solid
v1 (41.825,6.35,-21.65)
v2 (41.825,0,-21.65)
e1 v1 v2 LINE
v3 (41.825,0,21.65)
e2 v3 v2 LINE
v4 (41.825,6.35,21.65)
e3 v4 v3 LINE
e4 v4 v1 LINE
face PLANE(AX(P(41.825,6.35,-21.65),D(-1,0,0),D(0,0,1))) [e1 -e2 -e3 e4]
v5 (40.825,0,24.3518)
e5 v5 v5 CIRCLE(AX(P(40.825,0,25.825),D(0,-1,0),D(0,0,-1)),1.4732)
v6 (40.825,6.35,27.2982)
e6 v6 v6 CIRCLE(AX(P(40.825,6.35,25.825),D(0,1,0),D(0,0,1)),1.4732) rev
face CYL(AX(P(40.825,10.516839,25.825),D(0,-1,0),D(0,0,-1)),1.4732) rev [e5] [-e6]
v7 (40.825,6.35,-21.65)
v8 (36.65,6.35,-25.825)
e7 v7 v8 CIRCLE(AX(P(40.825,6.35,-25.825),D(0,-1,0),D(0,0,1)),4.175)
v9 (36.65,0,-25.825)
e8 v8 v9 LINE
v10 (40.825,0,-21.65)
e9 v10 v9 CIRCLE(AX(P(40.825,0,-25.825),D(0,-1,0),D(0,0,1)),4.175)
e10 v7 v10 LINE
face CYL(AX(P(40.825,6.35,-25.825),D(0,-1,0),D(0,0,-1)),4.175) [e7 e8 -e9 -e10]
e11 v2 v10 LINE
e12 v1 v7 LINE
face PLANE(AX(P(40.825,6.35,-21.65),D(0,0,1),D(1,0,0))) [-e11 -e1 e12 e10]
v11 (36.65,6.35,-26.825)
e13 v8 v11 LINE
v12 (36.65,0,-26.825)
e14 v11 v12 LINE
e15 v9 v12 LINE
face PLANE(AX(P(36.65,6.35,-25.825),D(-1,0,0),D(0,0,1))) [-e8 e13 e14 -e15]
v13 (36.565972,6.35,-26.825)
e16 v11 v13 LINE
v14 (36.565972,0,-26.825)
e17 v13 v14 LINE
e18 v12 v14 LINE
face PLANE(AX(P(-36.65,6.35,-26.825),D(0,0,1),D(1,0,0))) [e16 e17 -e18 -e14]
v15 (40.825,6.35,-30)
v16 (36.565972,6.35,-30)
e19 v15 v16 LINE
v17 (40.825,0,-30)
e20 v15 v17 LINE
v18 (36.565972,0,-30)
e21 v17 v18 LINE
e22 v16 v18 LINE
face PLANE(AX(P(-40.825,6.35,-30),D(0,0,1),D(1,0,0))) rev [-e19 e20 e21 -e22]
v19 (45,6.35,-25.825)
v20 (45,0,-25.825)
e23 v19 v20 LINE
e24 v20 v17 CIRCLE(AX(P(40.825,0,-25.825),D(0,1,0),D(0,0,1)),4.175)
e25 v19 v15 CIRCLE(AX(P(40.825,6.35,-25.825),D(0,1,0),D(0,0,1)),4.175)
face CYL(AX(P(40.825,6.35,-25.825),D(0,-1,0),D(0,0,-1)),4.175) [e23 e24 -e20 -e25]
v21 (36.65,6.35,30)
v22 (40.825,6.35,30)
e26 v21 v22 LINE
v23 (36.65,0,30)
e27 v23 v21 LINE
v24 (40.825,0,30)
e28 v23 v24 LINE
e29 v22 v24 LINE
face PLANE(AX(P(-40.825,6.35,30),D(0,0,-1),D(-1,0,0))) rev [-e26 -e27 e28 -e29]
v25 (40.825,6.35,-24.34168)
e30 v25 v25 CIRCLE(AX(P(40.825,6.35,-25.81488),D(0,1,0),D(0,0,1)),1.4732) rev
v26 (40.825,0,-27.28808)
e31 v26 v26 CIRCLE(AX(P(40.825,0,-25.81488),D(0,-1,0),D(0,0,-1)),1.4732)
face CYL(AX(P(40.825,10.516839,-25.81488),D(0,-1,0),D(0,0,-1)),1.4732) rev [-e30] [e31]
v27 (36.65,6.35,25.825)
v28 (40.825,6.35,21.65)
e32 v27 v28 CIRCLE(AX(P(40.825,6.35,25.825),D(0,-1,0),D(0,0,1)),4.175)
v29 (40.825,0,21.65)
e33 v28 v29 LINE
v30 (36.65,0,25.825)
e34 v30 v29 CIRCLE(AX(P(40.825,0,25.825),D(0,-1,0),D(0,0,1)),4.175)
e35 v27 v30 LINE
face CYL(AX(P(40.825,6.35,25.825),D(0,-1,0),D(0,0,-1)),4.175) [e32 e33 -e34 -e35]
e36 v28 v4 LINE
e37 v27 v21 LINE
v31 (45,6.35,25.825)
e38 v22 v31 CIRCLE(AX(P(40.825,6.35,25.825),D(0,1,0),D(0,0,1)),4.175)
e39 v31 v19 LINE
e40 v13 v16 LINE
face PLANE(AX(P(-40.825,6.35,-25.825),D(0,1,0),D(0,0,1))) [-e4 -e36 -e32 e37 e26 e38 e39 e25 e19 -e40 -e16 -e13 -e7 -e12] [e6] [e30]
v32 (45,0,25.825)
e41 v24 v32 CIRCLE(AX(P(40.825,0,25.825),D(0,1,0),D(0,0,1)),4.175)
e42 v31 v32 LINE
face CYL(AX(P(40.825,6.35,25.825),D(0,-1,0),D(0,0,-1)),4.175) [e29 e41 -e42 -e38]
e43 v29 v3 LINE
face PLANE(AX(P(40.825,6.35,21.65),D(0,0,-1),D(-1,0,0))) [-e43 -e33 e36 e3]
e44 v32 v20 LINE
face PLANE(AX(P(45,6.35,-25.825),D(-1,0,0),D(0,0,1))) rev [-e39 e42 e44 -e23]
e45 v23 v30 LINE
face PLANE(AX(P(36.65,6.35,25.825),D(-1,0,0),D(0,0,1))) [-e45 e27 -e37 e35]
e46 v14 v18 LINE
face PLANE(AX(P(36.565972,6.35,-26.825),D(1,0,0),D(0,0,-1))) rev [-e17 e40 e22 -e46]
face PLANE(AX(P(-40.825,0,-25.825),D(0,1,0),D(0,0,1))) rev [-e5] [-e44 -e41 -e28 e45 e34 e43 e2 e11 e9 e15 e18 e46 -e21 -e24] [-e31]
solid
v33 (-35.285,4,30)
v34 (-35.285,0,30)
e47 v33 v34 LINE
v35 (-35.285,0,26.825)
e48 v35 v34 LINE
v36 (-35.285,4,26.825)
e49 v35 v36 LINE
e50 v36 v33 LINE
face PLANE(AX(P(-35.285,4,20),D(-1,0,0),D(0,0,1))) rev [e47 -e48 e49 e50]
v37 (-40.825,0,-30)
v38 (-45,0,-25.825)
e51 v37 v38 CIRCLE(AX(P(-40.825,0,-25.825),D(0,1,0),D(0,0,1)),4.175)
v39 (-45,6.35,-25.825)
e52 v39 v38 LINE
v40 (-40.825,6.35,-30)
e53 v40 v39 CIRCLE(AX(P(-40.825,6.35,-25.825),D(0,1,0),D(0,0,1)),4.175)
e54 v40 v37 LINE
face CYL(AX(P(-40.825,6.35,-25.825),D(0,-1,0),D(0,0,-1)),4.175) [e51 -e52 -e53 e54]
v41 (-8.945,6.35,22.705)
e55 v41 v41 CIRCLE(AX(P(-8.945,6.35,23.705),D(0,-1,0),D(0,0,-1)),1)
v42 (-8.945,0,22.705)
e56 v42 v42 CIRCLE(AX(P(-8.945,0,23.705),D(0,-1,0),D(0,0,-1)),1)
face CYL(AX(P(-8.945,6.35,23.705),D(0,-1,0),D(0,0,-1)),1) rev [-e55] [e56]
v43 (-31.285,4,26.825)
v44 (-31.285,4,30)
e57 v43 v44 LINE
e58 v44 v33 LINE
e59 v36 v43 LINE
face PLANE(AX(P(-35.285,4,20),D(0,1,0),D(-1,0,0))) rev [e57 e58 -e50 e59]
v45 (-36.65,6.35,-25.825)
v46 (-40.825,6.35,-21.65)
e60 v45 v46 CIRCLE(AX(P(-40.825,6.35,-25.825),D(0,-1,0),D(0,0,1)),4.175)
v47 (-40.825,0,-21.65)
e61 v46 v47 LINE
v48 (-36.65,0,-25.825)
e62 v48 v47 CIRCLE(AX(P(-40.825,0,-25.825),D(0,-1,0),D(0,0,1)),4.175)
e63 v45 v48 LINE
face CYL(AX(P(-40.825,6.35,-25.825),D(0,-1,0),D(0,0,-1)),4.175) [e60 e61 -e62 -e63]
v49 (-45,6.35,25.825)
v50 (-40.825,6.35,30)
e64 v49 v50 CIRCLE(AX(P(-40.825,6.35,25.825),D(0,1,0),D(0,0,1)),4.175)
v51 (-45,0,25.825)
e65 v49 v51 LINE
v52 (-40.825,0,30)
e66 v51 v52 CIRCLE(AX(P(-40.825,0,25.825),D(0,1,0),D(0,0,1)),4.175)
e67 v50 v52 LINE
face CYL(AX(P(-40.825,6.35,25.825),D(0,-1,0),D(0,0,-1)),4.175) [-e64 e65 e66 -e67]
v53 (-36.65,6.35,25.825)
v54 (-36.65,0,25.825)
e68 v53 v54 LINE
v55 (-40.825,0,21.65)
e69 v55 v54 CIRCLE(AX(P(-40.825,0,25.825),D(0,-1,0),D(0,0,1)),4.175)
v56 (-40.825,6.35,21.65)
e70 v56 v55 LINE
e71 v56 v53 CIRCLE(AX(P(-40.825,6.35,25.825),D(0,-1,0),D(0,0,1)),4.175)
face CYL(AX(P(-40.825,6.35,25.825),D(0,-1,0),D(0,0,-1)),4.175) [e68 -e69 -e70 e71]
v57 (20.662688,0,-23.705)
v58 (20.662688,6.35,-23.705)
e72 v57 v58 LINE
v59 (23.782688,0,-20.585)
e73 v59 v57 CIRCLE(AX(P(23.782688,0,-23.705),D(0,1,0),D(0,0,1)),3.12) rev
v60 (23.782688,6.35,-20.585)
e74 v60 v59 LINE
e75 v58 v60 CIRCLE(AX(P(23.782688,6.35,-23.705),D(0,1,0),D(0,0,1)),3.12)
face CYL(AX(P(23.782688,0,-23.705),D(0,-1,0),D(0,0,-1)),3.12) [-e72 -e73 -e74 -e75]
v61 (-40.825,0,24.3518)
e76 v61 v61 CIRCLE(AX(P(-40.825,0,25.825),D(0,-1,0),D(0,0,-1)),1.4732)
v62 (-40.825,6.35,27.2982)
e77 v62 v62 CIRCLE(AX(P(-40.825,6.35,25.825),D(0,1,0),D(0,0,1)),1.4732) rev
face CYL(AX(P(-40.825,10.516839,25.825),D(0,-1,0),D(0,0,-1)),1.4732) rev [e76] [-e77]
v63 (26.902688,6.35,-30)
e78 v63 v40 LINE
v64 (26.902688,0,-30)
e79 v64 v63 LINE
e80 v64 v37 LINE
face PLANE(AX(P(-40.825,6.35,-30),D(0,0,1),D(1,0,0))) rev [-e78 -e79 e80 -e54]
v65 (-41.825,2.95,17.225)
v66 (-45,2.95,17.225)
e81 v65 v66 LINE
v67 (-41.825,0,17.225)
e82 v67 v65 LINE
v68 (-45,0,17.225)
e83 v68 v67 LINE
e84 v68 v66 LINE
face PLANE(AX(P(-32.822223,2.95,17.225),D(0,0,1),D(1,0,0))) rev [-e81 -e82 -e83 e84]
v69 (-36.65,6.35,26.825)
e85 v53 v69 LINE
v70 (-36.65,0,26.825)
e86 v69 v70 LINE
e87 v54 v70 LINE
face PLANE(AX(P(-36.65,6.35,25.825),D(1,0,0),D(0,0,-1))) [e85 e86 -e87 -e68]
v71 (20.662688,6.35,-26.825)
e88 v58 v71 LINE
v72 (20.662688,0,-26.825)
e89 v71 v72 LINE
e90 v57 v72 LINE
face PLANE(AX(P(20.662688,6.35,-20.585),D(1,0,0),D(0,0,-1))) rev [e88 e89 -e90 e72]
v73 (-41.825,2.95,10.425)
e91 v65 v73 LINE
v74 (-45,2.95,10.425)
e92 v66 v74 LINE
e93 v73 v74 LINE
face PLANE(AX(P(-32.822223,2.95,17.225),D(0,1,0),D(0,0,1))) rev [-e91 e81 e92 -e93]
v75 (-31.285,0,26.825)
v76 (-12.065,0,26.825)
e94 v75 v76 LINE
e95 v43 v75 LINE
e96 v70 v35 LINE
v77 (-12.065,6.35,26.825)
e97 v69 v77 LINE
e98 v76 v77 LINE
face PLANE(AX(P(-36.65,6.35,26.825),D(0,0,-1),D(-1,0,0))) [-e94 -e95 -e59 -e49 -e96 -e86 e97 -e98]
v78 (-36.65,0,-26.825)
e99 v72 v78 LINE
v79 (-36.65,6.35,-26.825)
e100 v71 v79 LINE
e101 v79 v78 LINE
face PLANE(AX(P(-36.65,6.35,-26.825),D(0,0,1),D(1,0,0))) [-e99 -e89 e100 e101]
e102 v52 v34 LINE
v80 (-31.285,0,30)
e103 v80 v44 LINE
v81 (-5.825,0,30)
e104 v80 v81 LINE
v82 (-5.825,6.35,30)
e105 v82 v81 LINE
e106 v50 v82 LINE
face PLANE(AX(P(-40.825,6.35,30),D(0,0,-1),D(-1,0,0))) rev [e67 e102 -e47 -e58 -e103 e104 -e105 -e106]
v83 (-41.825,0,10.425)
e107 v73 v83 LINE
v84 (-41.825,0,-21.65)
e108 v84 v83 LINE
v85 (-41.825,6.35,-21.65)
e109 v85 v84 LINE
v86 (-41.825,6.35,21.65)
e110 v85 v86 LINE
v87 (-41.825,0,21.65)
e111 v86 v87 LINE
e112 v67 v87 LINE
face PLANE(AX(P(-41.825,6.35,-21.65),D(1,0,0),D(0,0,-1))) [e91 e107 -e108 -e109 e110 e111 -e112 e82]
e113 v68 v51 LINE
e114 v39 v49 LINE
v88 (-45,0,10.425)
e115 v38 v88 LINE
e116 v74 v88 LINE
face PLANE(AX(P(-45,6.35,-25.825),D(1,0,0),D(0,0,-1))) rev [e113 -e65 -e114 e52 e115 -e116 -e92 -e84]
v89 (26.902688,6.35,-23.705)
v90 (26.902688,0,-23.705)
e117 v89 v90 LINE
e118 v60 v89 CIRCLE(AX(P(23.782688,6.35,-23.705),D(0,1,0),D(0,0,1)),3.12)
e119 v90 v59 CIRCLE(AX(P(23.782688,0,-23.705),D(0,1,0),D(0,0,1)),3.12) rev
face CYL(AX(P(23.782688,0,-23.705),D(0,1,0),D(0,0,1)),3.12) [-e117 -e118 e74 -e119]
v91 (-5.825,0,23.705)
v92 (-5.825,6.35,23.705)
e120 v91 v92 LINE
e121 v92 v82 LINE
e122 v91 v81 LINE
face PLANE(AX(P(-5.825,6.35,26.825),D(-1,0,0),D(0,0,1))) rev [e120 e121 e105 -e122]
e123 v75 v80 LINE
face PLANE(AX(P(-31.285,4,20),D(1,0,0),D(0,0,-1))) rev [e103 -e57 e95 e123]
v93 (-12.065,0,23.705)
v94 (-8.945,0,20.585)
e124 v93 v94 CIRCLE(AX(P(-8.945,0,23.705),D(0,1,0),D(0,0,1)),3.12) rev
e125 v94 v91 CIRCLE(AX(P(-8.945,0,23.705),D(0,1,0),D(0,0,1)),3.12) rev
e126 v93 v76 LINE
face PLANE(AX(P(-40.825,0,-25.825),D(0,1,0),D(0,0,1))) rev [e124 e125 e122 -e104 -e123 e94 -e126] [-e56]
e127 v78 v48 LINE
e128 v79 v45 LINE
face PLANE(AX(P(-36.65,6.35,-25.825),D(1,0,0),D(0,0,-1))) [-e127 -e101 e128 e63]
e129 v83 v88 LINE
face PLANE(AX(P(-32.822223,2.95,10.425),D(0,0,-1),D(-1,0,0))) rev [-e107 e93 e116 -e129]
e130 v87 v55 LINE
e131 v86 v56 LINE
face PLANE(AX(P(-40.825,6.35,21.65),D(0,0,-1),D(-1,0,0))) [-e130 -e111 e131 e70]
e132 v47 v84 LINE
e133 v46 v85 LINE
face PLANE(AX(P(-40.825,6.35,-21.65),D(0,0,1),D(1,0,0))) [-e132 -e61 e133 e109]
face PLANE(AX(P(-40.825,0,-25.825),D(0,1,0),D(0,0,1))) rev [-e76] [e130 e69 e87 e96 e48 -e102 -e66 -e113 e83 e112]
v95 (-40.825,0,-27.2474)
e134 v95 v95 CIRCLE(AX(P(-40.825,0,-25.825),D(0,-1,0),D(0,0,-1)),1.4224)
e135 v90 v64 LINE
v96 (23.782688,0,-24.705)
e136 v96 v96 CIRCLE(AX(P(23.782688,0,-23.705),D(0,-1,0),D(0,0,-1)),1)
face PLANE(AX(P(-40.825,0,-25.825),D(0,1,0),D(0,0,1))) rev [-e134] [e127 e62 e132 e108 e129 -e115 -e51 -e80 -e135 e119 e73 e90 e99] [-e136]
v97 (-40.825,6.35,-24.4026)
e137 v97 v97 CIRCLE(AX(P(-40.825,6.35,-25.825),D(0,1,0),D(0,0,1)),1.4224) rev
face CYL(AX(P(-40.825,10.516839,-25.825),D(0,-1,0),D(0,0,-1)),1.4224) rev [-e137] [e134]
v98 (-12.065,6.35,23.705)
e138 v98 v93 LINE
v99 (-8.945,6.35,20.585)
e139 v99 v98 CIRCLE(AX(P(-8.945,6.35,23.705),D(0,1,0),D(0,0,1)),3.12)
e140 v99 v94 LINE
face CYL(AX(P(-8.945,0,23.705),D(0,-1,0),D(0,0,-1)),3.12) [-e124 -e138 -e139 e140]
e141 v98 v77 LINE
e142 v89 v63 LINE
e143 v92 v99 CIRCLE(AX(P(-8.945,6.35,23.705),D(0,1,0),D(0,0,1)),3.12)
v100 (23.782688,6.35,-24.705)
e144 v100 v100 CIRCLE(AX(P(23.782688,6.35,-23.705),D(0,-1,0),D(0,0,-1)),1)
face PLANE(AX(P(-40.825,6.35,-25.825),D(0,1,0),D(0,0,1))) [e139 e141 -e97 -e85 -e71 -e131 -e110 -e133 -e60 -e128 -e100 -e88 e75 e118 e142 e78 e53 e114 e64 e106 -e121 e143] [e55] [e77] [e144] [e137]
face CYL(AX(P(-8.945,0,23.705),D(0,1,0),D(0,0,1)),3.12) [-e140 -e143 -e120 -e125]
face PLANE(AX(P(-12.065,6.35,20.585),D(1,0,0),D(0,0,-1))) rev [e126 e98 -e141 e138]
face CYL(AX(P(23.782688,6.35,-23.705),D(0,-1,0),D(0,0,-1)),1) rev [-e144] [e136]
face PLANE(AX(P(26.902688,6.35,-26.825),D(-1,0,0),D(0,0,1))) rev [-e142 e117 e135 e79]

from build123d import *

# Parameters (mm, degrees)
BOSS_EXTRUDE3_DEPTH = 6.35
SKETCH3_W           = 9.663283239
SKETCH3_H           = 6.35
CUT_EXTRUDE1_DEPTH  = 3.175
SKETCH4_W           = 42.475
SKETCH4_H           = 6.35
CUT_EXTRUDE2_DEPTH  = 8.35
SKETCH5_W           = 6.8
SKETCH5_H           = 5.9
CUT_EXTRUDE3_DEPTH  = 3.175
SKETCH6_R           = 1.4732
CUT_EXTRUDE4_DEPTH  = 6.35
SKETCH7_R           = 1.4224
SKETCH7_R_2         = 1.4732
CUT_EXTRUDE5_DEPTH  = 6.35
SKETCH8_W           = 6.24
SKETCH8_H           = 6.35
BOSS_EXTRUDE4_DEPTH = 6.24
SKETCH9_W           = 6.24
SKETCH9_H           = 6.35
BOSS_EXTRUDE5_DEPTH = 6.24
SKETCH10_R          = 1
CUT_EXTRUDE6_DEPTH  = 55.454774814
FILLET1_R           = 3.12
SKETCH11_W          = 4
SKETCH11_H          = 4
CUT_EXTRUDE7_DEPTH  = 10


with BuildPart() as part:
    # Sketch2 → Boss-Extrude3 (new body)
    with BuildSketch(Plane(origin=(0, 0, 0), x_dir=(1, 0, 0), z_dir=(0, 1, 0))):
        with BuildLine():
            Line((-45, 25.825), (-45, -25.825))
            ThreePointArc((-45, -25.825), (-43.777170811, -28.777170811), (-40.825, -30))
            Line((-40.825, -30), (40.825, -30))
            ThreePointArc((40.825, -30), (43.777170811, -28.777170811), (45, -25.825))
            Line((45, -25.825), (45, 25.825))
            ThreePointArc((45, 25.825), (43.777170811, 28.777170811), (40.825, 30))
            Line((40.825, 30), (-40.825, 30))
            ThreePointArc((-40.825, 30), (-43.777170811, 28.777170811), (-45, 25.825))
        make_face()
        with BuildLine():
            Line((40.825, 21.65), (41.825, 21.65))
            Line((41.825, 21.65), (41.825, -21.65))
            Line((41.825, -21.65), (40.825, -21.65))
            ThreePointArc((40.825, -21.65), (37.872829189, -22.872829189), (36.65, -25.825))
            Line((36.65, -25.825), (36.65, -26.825))
            Line((36.65, -26.825), (-36.65, -26.825))
            Line((-36.65, -26.825), (-36.65, -25.825))
            ThreePointArc((-36.65, -25.825), (-37.872829189, -22.872829189), (-40.825, -21.65))
            Line((-40.825, -21.65), (-41.825, -21.65))
            Line((-41.825, -21.65), (-41.825, 21.65))
            Line((-41.825, 21.65), (-40.825, 21.65))
            ThreePointArc((-40.825, 21.65), (-37.872829189, 22.872829189), (-36.65, 25.825))
            Line((-36.65, 25.825), (-36.65, 26.825))
            Line((-36.65, 26.825), (36.65, 26.825))
            Line((36.65, 26.825), (36.65, 25.825))
            ThreePointArc((36.65, 25.825), (37.872829189, 22.872829189), (40.825, 21.65))
        make_face(mode=Mode.SUBTRACT)
    extrude(amount=BOSS_EXTRUDE3_DEPTH)

    # Sketch3 → Cut-Extrude1 (cut)
    with BuildSketch(Plane(origin=(0, 0, -30), x_dir=(-1, 0, 0), z_dir=(0, 0, -1))):
        with Locations((-31.734329903, 3.175)):
            Rectangle(SKETCH3_W, SKETCH3_H)
    extrude(amount=-CUT_EXTRUDE1_DEPTH, mode=Mode.SUBTRACT)

    # Sketch4 → Cut-Extrude2 (cut)
    with BuildSketch(Plane.XY.offset(30)):
        with Locations((15.4125, 3.175)):
            Rectangle(SKETCH4_W, SKETCH4_H)
    extrude(amount=-CUT_EXTRUDE2_DEPTH, mode=Mode.SUBTRACT)


with BuildPart() as cut_extrude2_piece_1:
    # of the separate pieces the step leaves, piece 1, a body of its own (cut_extrude2_pieces)
    add(part.part.solids().sort_by_distance((-40.825, 0, 30))[0])

    # Sketch5 → Cut-Extrude3 (cut)
    with BuildSketch(Plane.ZY.offset(45)):
        with Locations((13.825, 0)):
            Rectangle(SKETCH5_W, SKETCH5_H)
    extrude(amount=-CUT_EXTRUDE3_DEPTH, mode=Mode.SUBTRACT)

    # Sketch7 → Cut-Extrude5 (cut)
    with BuildSketch(Plane.XZ):
        with Locations(Location((-40.825, -25.825, 0), (0, 0, 270))):
            Circle(SKETCH7_R)
        with Locations(Location((-40.825, 25.825, 0), (0, 0, 270))):
            Circle(SKETCH7_R_2)
    extrude(amount=-CUT_EXTRUDE5_DEPTH, mode=Mode.SUBTRACT)

    # Sketch8 → Boss-Extrude4 (add)
    with BuildSketch(Plane(origin=(0, 0, 26.825), x_dir=(-1, 0, 0), z_dir=(0, 0, -1))):
        with Locations((8.945, 3.175)):
            Rectangle(SKETCH8_W, SKETCH8_H)
    extrude(amount=BOSS_EXTRUDE4_DEPTH)

    # Sketch9 → Boss-Extrude5 (add)
    with BuildSketch(Plane.XY.offset(-26.825)):
        with Locations((23.782688283, 3.175)):
            Rectangle(SKETCH9_W, SKETCH9_H)
    extrude(amount=BOSS_EXTRUDE5_DEPTH)

    # Sketch10 → Cut-Extrude6 (cut, through all)
    with BuildSketch(Plane(origin=(0, 0, 0), x_dir=(-1, 0, 0), z_dir=(0, -1, 0))):
        with Locations(Location((-23.782688283, 23.705, 0), (0, 0, 90))):
            Circle(SKETCH10_R)
        with Locations(Location((8.945, -23.705, 0), (0, 0, 90))):
            Circle(SKETCH10_R)
    extrude(amount=-CUT_EXTRUDE6_DEPTH, mode=Mode.SUBTRACT)

    # Fillet1
    fillet1_edges = [cut_extrude2_piece_1.edges().sort_by_distance(p)[0] for p in [
        (-12.065, 3.175, 20.585),
        (-5.825, 3.175, 20.585),
        (26.902688283, 3.175, -20.585),
        (20.662688283, 3.175, -20.585),
    ]]
    fillet(fillet1_edges, radius=FILLET1_R - 0.0001)  # a hair under: the kernel refuses the full size

    # Sketch11 → Cut-Extrude7 (cut)
    with BuildSketch(Plane.XY.offset(30)):
        with Locations((-33.285, 2)):
            Rectangle(SKETCH11_W, SKETCH11_H)
    extrude(amount=-CUT_EXTRUDE7_DEPTH, mode=Mode.SUBTRACT)


with BuildPart() as cut_extrude2_piece_2:
    # of the separate pieces the step leaves, piece 2, a body of its own (cut_extrude2_pieces)
    add(part.part.solids().sort_by_distance((40.825, 0, -30))[0])

    # Sketch6 → Cut-Extrude4 (cut)
    with BuildSketch(Plane.XZ):
        with Locations(Location((40.825, 25.825, 0), (0, 0, 270))):
            Circle(SKETCH6_R)
        with Locations(Location((40.825, -25.81487963, 0), (0, 0, 270))):
            Circle(SKETCH6_R)
    extrude(amount=-CUT_EXTRUDE4_DEPTH, mode=Mode.SUBTRACT)


solid = Compound([cut_extrude2_piece_1.part, cut_extrude2_piece_2.part])
